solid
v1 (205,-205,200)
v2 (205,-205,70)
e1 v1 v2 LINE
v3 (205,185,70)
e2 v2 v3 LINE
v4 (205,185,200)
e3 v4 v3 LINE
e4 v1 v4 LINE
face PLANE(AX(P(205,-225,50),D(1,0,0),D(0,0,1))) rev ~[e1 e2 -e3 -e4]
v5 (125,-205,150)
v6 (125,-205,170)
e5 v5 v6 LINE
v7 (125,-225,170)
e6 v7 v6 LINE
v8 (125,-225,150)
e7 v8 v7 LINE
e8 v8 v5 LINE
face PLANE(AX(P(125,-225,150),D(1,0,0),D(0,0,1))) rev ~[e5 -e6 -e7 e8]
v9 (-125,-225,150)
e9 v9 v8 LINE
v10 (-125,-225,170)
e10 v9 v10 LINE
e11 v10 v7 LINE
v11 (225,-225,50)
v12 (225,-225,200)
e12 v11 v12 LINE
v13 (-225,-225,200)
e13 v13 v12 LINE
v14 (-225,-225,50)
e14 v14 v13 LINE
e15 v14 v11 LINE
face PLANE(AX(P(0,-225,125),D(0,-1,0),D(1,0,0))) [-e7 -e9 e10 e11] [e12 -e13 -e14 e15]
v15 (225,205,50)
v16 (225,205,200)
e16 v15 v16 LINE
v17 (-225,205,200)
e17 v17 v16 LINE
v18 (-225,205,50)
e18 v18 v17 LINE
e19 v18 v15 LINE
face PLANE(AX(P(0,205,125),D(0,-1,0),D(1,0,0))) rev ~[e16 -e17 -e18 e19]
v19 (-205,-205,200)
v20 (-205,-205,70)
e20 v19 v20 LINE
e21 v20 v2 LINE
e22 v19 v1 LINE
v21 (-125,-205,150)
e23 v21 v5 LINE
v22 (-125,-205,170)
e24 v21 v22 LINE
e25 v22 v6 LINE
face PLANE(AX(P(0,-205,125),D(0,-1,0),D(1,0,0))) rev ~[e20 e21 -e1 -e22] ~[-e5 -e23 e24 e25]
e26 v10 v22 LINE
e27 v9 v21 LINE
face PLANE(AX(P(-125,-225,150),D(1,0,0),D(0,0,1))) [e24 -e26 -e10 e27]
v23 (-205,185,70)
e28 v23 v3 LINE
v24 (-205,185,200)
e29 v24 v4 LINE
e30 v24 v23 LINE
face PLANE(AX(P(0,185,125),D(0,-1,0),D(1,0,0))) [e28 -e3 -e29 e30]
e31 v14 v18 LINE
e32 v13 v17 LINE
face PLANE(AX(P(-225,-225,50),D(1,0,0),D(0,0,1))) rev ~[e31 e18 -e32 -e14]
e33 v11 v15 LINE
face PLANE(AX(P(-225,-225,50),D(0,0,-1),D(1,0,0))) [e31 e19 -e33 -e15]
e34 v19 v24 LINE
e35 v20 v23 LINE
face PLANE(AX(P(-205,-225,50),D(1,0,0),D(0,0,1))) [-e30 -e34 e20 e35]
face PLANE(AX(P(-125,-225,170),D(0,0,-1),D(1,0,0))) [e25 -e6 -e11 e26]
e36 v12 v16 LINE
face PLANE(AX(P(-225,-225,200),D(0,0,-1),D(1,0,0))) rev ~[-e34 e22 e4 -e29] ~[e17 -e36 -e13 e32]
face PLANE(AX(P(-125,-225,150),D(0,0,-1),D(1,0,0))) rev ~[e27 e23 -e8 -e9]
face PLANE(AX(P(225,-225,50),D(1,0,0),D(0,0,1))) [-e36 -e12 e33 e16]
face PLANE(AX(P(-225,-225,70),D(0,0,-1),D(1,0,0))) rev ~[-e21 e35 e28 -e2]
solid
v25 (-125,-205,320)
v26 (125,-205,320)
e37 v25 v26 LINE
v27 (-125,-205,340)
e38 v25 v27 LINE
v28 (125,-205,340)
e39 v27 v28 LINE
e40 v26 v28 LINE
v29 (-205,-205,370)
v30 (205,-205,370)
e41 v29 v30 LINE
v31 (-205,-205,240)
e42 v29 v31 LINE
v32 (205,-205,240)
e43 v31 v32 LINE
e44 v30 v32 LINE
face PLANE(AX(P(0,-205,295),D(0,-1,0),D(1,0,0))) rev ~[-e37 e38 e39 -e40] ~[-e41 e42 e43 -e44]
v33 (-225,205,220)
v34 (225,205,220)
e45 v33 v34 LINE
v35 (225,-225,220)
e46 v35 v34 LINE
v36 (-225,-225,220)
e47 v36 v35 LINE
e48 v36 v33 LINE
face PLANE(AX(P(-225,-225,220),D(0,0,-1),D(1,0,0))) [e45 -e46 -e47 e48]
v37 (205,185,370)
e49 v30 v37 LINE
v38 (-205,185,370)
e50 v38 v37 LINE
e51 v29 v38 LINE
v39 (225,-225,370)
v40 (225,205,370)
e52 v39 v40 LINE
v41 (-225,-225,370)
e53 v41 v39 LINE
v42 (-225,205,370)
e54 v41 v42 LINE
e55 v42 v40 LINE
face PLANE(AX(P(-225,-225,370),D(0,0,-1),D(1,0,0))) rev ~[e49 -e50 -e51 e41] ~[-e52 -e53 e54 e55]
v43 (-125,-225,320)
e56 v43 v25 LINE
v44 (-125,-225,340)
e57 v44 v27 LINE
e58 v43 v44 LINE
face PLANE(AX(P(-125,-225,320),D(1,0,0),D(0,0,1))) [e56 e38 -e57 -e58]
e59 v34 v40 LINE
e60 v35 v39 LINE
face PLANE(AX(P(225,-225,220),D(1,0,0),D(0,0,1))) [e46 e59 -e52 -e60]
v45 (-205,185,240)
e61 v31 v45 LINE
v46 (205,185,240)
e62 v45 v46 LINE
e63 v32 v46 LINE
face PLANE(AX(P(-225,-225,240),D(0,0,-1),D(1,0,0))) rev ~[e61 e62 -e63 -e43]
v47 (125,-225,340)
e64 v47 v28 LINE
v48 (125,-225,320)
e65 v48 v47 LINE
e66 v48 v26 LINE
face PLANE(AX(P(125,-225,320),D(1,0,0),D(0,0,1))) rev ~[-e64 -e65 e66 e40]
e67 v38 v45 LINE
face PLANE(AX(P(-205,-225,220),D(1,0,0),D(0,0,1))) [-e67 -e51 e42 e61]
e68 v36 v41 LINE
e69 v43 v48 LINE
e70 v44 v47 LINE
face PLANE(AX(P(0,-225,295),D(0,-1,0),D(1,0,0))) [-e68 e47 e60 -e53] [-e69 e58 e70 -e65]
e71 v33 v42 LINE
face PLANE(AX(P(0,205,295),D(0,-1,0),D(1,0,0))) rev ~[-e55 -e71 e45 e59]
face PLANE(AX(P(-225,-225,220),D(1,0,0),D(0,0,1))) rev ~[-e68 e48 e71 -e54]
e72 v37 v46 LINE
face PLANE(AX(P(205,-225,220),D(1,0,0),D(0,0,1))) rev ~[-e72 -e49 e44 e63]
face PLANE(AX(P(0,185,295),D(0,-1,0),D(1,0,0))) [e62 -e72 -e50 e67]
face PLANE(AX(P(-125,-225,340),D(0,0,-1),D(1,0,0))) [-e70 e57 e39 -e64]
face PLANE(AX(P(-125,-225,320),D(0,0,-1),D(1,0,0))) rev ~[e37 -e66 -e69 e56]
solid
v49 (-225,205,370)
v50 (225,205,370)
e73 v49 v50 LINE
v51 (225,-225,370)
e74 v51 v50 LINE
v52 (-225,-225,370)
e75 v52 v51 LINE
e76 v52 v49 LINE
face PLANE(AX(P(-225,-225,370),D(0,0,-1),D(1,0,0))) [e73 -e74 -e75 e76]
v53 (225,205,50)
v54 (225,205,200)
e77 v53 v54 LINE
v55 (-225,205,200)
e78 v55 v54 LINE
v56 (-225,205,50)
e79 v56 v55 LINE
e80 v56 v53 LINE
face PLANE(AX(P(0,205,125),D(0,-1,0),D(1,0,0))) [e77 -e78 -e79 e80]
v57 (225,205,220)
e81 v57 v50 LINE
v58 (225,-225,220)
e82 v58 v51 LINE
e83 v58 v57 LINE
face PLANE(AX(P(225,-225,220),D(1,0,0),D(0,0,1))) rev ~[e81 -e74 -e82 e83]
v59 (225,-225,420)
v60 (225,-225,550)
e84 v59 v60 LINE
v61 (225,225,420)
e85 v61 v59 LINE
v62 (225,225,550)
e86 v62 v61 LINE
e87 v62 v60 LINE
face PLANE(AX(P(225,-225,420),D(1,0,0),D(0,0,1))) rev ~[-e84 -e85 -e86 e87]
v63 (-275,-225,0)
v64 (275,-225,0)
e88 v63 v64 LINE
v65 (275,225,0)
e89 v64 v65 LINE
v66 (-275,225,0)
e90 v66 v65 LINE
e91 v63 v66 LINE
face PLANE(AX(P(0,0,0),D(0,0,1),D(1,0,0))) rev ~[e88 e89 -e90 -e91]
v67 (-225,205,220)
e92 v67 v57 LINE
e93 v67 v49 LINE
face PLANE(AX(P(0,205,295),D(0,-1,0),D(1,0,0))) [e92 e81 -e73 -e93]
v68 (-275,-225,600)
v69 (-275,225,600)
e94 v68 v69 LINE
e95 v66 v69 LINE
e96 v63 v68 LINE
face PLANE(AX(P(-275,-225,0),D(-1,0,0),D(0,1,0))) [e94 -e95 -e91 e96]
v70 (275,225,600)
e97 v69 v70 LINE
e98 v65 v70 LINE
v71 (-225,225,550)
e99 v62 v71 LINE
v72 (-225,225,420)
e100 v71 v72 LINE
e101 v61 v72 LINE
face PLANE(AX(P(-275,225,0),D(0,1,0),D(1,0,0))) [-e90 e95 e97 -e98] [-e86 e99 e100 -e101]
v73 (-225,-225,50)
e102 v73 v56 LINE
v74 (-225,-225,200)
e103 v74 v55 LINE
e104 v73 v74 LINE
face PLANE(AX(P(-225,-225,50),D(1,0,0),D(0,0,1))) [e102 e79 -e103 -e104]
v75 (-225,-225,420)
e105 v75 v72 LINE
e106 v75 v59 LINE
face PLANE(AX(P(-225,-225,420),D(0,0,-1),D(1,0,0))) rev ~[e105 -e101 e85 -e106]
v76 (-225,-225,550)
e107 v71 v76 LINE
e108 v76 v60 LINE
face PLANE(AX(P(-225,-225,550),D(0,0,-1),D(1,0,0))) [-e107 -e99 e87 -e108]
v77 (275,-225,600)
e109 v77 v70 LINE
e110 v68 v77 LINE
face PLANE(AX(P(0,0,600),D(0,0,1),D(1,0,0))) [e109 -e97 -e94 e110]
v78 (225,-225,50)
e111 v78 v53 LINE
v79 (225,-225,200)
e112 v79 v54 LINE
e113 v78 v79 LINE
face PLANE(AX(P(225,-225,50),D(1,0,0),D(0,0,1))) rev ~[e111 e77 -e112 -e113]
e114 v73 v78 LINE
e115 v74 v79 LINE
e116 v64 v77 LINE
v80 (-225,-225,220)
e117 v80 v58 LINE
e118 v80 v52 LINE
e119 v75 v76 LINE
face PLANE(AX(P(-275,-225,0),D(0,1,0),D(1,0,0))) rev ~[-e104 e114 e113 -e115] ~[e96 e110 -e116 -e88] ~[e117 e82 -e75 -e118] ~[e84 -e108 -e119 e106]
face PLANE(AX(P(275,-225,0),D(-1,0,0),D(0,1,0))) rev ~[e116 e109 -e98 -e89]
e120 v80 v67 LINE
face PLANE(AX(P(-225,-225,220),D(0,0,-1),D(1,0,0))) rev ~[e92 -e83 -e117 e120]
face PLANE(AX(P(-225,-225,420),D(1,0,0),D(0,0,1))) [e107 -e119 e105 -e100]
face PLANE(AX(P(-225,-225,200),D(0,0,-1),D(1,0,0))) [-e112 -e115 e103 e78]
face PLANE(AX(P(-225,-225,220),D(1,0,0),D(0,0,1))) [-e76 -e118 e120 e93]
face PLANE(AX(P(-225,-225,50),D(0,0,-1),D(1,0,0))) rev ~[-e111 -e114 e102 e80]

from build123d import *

# Parameters (mm, degrees)
F0_W     = 550
F0_H     = 450
F1_DEPTH = 600
F2_W     = 450
F2_H     = 150
F2_H_2   = 130
F3_DEPTH = 430
F4_DEPTH = 20.001
F5_DEPTH = 430
F6_T     = -20
F6_2_T   = -20
F7_W     = 250
F7_H     = 20
F8_DEPTH = 20


with BuildPart() as f1:
    # F0 (on Top) → F1 (new body)
    with BuildSketch(Plane.XY):
        Rectangle(F0_W, F0_H)
    extrude(amount=F1_DEPTH)

    # F2 (on face) → F3 (cut)
    with BuildSketch(Plane.XZ.offset(225)):
        with Locations((0, 125)):
            Rectangle(F2_W, F2_H)
        with Locations((0, 295)):
            Rectangle(F2_W, F2_H)
        with Locations((0, 485)):
            Rectangle(F2_W, F2_H_2)
    extrude(amount=-F3_DEPTH, mode=Mode.SUBTRACT)

    # F4 (cut, through all): a face of the model
    f4_faces = [f1.faces().sort_by_distance(p)[0] for p in [
        (0, 205, 485),
    ]]
    extrude(f4_faces, amount=-F4_DEPTH, mode=Mode.SUBTRACT)


with BuildPart() as f5:
    # F2 (on face) → F5 (new body, through all)
    with BuildSketch(Plane.XZ.offset(225)):
        with Locations((0, 125)):
            Rectangle(F2_W, F2_H)
    extrude(amount=-F5_DEPTH)

    # F6#2
    f6_2_openings = [f5.faces().sort_by_distance(p)[0] for p in [
        (0, -10, 200),
    ]]
    offset(amount=F6_2_T, openings=f6_2_openings)


with BuildPart() as f5b:
    # F2 (on face) → F5, piece 2 (new body, through all)
    with BuildSketch(Plane.XZ.offset(225)):
        with Locations((0, 295)):
            Rectangle(F2_W, F2_H)
    extrude(amount=-F5_DEPTH)

    # F6
    f6_openings = [f5b.faces().sort_by_distance(p)[0] for p in [
        (0, -10, 370),
    ]]
    offset(amount=F6_T, openings=f6_openings)


with BuildPart() as f8_tool:
    # F7 (on face) → F8 (new body, through all)
    with BuildSketch(Plane.XZ.offset(225)):
        with Locations((0, 330)):
            Rectangle(F7_W, F7_H)
        with Locations((0, 160)):
            Rectangle(F7_W, F7_H)
    extrude(amount=-F8_DEPTH)


with BuildPart() as f5_1:
    add(f5.part)

    # F8: cut by f8_tool
    add(f8_tool.part, mode=Mode.SUBTRACT)


with BuildPart() as f5b_1:
    add(f5b.part)

    # F8: cut by f8_tool
    add(f8_tool.part, mode=Mode.SUBTRACT)


solid = Compound([f1.part, f5_1.part, f5b_1.part])
